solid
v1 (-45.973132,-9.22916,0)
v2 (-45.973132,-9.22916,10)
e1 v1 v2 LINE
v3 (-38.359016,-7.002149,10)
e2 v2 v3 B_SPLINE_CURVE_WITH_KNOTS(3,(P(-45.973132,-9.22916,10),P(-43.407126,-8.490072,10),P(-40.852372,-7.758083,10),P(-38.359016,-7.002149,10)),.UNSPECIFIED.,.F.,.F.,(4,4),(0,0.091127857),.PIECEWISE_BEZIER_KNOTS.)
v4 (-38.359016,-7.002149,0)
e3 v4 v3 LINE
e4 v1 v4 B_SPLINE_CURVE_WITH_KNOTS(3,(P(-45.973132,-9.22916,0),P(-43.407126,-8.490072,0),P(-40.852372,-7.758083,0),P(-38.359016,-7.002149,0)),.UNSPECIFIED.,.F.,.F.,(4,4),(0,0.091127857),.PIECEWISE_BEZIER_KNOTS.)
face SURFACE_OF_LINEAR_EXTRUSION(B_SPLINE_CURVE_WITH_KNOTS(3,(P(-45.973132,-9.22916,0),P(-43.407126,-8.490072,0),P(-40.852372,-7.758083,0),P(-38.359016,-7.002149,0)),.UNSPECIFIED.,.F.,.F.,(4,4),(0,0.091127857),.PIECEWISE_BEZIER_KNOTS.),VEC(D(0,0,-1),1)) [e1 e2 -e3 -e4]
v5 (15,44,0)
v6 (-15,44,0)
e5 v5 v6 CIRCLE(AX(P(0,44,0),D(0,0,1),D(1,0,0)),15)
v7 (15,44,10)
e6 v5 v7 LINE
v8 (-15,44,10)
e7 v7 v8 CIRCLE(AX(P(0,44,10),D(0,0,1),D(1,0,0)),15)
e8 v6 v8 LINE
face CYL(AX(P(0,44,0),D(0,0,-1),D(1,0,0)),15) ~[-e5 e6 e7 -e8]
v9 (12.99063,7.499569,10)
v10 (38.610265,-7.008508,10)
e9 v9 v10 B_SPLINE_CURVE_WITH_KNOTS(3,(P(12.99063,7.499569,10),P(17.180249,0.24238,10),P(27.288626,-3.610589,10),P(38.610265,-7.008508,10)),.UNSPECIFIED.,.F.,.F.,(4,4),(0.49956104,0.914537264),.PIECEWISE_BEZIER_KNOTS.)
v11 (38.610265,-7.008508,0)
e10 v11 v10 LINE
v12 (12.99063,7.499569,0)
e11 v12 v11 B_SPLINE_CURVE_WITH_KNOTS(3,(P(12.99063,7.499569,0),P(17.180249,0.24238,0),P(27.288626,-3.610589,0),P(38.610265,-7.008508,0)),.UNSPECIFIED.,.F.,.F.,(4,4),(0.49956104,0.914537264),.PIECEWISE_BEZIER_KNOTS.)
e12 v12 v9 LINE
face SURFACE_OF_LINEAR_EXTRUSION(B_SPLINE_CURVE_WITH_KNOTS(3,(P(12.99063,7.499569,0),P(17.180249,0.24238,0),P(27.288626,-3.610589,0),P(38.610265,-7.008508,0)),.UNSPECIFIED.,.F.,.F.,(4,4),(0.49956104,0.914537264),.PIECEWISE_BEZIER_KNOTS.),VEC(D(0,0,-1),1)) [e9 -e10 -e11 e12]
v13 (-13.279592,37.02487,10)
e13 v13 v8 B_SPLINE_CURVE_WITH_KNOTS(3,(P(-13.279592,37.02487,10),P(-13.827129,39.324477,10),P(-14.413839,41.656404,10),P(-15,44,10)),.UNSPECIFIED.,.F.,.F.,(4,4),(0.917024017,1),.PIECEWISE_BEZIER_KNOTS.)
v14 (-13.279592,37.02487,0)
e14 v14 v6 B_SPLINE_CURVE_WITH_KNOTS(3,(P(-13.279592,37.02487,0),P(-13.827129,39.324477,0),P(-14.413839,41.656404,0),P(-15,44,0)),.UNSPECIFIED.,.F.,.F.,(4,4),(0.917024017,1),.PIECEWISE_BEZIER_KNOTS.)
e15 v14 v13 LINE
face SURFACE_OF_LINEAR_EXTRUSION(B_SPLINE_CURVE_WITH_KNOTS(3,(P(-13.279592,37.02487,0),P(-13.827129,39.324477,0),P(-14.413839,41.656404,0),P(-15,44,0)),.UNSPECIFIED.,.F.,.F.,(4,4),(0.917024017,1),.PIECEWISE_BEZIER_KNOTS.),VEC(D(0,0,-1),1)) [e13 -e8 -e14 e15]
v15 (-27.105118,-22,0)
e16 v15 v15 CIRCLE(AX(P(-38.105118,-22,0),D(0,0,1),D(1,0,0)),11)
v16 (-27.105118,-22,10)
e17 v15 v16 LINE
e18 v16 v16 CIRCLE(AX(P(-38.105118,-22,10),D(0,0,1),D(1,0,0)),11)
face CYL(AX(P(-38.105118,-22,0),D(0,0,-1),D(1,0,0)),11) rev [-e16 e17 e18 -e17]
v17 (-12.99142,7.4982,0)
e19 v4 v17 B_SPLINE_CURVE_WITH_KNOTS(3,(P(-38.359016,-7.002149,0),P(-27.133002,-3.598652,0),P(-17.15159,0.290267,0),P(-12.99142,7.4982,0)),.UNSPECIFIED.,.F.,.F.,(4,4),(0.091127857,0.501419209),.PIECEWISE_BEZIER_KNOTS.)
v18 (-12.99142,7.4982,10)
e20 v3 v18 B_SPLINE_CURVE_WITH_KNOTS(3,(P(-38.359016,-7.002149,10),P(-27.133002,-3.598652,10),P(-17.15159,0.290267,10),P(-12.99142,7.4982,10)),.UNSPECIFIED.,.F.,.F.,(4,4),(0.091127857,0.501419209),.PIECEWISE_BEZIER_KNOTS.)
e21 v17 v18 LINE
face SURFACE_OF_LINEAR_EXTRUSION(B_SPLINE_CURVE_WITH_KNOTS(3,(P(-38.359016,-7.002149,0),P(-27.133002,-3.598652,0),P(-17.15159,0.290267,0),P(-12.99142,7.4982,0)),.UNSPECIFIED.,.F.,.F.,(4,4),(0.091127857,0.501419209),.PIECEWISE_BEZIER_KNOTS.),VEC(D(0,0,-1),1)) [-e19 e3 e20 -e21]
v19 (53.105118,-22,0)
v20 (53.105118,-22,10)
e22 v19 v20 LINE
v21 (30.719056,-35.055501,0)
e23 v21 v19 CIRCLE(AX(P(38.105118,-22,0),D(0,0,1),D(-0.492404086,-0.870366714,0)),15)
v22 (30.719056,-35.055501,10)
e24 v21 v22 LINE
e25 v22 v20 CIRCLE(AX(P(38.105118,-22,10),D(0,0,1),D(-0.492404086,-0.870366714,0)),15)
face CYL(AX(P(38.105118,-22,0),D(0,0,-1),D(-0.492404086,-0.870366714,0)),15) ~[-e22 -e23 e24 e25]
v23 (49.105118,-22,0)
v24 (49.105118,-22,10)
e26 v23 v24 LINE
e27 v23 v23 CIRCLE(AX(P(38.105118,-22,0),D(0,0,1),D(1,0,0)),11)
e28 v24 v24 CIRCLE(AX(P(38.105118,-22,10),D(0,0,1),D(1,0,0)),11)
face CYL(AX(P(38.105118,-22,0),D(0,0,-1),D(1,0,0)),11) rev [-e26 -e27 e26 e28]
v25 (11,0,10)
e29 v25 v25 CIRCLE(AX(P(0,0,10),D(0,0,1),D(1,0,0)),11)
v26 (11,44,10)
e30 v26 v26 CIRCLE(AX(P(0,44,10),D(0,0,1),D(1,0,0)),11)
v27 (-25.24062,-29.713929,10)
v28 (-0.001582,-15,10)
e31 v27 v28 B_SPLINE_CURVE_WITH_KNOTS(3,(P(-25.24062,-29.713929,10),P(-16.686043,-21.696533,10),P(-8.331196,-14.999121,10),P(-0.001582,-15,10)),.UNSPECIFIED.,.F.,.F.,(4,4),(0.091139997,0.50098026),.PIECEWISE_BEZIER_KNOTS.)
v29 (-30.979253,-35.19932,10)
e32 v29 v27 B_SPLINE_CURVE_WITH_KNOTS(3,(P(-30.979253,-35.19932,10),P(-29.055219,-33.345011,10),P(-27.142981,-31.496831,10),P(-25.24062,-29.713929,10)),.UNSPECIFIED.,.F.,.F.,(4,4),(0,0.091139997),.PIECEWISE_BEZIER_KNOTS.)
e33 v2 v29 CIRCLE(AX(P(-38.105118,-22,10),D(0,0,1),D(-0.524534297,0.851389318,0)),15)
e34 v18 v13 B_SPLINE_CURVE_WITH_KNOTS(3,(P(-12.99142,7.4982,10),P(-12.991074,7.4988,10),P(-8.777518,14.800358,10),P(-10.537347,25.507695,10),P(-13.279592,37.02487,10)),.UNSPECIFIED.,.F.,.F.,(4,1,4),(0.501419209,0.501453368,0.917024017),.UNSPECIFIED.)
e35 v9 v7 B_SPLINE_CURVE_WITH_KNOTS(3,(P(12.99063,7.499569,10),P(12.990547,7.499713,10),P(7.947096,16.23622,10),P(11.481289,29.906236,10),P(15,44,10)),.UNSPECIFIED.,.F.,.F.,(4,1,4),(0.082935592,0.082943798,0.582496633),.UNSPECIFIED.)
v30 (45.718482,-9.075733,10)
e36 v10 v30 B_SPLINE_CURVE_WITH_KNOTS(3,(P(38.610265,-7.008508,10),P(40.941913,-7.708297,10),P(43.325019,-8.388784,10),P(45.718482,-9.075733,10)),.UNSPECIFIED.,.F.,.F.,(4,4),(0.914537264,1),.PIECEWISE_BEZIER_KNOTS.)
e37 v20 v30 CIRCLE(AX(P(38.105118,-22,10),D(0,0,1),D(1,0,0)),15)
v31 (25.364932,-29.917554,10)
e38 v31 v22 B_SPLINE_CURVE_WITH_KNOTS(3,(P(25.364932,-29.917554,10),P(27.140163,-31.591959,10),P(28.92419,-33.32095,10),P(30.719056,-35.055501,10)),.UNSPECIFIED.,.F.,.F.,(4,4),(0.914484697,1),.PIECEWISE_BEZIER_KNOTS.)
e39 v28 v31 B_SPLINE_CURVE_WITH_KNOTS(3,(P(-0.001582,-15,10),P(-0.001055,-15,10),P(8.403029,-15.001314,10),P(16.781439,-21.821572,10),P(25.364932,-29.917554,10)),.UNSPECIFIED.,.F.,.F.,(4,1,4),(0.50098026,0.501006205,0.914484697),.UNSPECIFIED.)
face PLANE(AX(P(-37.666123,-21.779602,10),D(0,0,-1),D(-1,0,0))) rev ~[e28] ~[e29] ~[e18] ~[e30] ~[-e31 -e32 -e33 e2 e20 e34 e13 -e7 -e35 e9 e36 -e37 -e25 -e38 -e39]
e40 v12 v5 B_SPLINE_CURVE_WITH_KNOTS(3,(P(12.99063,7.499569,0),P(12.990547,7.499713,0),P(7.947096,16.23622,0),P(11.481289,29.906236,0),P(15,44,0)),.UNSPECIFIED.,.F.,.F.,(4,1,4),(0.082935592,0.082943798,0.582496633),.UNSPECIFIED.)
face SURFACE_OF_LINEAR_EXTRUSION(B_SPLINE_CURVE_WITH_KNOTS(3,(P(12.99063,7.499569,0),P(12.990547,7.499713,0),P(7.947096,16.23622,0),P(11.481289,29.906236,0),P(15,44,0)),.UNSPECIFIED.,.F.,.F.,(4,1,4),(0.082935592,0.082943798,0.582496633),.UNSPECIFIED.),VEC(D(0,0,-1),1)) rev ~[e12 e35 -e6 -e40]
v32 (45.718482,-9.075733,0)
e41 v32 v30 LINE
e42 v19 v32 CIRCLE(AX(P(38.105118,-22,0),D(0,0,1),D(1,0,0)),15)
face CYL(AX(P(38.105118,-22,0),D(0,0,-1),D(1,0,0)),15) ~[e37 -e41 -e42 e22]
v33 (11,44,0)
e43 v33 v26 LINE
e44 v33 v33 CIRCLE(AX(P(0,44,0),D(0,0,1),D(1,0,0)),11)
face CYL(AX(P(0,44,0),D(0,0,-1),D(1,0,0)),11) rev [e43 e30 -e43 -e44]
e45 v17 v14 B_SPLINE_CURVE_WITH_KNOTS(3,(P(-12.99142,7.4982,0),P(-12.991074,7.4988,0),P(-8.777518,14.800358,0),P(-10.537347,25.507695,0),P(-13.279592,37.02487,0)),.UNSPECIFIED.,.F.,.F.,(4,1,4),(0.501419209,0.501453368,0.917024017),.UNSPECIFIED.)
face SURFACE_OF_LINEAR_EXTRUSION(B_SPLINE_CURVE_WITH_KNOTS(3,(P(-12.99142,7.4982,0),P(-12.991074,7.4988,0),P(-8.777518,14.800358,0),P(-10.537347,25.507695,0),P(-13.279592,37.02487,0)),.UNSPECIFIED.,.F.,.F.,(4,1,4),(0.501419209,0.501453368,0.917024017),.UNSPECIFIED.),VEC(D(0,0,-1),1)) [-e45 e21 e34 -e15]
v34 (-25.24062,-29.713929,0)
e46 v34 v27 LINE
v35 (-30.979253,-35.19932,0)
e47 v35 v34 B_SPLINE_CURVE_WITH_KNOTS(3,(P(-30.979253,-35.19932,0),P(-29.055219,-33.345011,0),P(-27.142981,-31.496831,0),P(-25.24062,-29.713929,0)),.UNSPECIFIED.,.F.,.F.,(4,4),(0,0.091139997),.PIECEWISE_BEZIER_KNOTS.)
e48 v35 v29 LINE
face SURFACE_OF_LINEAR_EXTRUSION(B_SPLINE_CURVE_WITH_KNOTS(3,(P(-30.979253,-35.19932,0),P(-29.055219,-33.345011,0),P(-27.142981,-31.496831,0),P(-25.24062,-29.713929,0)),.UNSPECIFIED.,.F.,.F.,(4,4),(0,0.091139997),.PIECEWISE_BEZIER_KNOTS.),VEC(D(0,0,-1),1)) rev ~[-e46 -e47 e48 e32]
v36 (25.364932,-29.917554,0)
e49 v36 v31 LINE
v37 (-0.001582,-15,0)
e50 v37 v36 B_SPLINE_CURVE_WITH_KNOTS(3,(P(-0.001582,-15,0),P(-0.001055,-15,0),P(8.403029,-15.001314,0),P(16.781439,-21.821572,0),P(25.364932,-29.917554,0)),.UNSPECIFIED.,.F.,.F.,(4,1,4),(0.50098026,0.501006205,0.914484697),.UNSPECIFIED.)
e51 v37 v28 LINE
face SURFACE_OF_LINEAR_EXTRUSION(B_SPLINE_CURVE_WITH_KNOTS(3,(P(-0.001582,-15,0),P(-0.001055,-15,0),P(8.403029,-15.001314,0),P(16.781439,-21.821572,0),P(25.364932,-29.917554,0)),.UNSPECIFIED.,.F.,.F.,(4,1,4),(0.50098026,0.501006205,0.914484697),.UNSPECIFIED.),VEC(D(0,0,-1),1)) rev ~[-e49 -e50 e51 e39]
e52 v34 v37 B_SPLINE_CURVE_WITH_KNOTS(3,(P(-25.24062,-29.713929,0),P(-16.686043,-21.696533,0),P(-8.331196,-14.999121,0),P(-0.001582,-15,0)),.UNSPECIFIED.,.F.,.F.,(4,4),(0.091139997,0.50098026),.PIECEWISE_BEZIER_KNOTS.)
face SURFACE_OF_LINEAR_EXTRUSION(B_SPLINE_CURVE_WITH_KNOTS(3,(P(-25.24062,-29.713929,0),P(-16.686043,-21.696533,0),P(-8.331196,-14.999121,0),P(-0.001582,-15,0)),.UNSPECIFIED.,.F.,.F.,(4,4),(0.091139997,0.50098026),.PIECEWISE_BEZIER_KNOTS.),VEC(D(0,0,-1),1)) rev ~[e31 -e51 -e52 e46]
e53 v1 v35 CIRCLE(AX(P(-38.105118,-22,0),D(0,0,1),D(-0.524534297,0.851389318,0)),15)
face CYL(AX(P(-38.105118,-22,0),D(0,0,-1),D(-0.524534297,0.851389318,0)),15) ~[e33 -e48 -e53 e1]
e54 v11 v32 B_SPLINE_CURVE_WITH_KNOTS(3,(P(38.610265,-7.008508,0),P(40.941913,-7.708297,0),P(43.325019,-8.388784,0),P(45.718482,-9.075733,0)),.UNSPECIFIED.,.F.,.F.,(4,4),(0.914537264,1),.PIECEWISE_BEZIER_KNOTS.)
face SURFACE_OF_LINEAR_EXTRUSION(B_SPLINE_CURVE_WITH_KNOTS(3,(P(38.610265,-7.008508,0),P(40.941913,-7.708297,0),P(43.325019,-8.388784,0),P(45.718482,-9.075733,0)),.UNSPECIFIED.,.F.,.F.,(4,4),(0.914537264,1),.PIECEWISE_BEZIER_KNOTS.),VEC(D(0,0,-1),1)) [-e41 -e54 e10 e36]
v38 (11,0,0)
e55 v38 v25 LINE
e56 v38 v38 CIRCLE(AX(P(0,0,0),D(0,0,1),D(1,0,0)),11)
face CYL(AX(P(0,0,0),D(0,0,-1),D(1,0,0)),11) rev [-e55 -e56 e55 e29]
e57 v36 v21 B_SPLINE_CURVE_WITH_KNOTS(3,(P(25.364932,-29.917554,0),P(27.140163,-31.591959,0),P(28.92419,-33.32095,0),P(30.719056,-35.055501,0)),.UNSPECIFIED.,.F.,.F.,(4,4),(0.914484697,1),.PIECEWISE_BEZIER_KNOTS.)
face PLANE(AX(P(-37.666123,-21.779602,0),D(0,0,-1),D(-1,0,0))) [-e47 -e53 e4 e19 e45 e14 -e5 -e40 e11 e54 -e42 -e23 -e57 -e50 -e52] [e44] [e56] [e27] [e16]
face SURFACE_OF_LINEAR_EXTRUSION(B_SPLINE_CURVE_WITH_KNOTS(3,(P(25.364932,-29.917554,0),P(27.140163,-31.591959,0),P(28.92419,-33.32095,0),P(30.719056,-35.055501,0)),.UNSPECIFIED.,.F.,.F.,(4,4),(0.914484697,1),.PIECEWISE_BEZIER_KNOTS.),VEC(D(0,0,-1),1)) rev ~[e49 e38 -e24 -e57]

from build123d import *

# Parameters (mm, degrees)
F0_R     = 11
F1_DEPTH = 10


# Not quite as in the source:
# - ends of sketch curves that miss each other by under 0.0002 mm in the source are joined


with BuildPart() as f1:
    # F0 (on Top) → F1 (new body)
    with BuildSketch(Plane.XY):
        with BuildLine():
            add(Edge.make_bspline(
                [(-45.9731322266, -9.229160229), (-43.4071259384, -8.4900716571), (-40.8523723257, -7.7580834253), (-38.3590158595, -7.002148962)],
                knots=[0, 0, 0, 0, 0.0911278571, 0.0911278571, 0.0911278571, 0.0911278571], degree=3))
            ThreePointArc((-45.9731322266, -9.229160229), (-51.0954988233, -29.5), (-30.9792533273, -35.1993202853))
            add(Edge.make_bspline(
                [(-30.9792533273, -35.1993202853), (-29.0552189861, -33.3450108014), (-27.1429808317, -31.496831403), (-25.2406198636, -29.713928552)],
                knots=[0, 0, 0, 0, 0.0911399969, 0.0911399969, 0.0911399969, 0.0911399969], degree=3))
            ThreePointArc((-25.2406198636, -29.713928552), (-23.6488480446, -26.0020326995), (-23.1051177665, -22))
            ThreePointArc((-23.1051177665, -22), (-27.5886656888, -11.3040084285), (-38.3590158595, -7.002148962))
        make_face()
        with Locations((-38.1051177665, -22)):
            Circle(F0_R, mode=Mode.SUBTRACT)
        with BuildLine():
            add(Edge.make_bspline(
                [(-38.3590158595, -7.002148962), (-27.1330019101, -3.5986521316), (-17.1515902552, 0.2902668448), (-12.9914200153, 7.4981996163)],
                knots=[0.0911278571, 0.0911278571, 0.0911278571, 0.0911278571, 0.5014192088, 0.5014192088, 0.5014192088, 0.5014192088], degree=3))
            ThreePointArc((-38.3590158595, -7.002148962), (-27.5886656888, -11.3040084285), (-23.1051177665, -22))
            ThreePointArc((-23.1051177665, -22), (-23.6488480446, -26.0020326995), (-25.2406198636, -29.713928552))
            add(Edge.make_bspline(
                [(-25.2406198636, -29.713928552), (-16.6860428704, -21.6965333438), (-8.3311964125, -14.9991213274), (-0.001581884, -14.9999997526)],
                knots=[0.0911399969, 0.0911399969, 0.0911399969, 0.0911399969, 0.5009802604, 0.5009802604, 0.5009802604, 0.5009802604], degree=3))
            ThreePointArc((-0.001581884, -14.9999997526), (-12.9902568617, -7.5002151081), (-12.9914200153, 7.4981996163))
        make_face()
        with BuildLine():
            add(Edge.make_bspline(
                [(-12.9914200153, 7.4981996163), (-12.9910736554, 7.4987997212), (-8.7775182768, 14.8003583601), (-10.5373469555, 25.5076949363), (-13.2795920522, 37.0248702573)],
                knots=[0.5014192088, 0.5014192088, 0.5014192088, 0.5014192088, 0.5014533681, 0.9170240175, 0.9170240175, 0.9170240175, 0.9170240175], degree=3))
            ThreePointArc((-12.9914200153, 7.4981996163), (-0.000790756, 14.9999999792), (12.9906296223, 7.4995694554))
            add(Edge.make_bspline(
                [(13.2855190223, 37.0361659764), (10.5442311657, 25.5033031012), (8.7843940058, 14.7858120219), (12.9905467554, 7.4997129635), (12.9906296223, 7.4995694554)],
                knots=[0.082935592, 0.082935592, 0.082935592, 0.082935592, 0.499552834, 0.4995610405, 0.4995610405, 0.4995610405, 0.4995610405], degree=3))
            ThreePointArc((13.2855190223, 37.0361659764), (0.0063781315, 29.000001356), (-13.2795920522, 37.0248702573))
        make_face()
        with BuildLine():
            ThreePointArc((12.9906296223, 7.4995694554), (-0.000790756, 14.9999999792), (-12.9914202607, 7.498199758))
            ThreePointArc((-12.9914202607, 7.498199758), (-12.9902568617, -7.5002151081), (-0.001581884, -14.9999999166))
            ThreePointArc((-0.001581884, -14.9999999166), (10.6060424226, -10.6071609835), (15, 0))
            ThreePointArc((15, 0), (14.4889517277, 3.8820455732), (12.9906296223, 7.4995694554))
        make_face()
        Circle(F0_R, mode=Mode.SUBTRACT)
        with BuildLine():
            ThreePointArc((15, 0), (10.6060424226, -10.6071609835), (-0.001581884, -14.9999999166))
            add(Edge.make_bspline(
                [(-0.001581884, -14.9999999166), (-0.0010545892, -14.9999998083), (8.4030291654, -15.0013139041), (16.7814390471, -21.8215724341), (25.3649320041, -29.9175543408)],
                knots=[0.5009802604, 0.5009802604, 0.5009802604, 0.5009802604, 0.5010062047, 0.9144846967, 0.9144846967, 0.9144846967, 0.9144846967], degree=3))
            ThreePointArc((25.3649320041, -29.9175543408), (25.119350955, -14.4920135645), (38.6102651526, -7.008508209))
            add(Edge.make_bspline(
                [(12.9906296082, 7.4995694472), (17.1802492182, 0.2423799612), (27.2886260541, -3.6105886019), (38.6102651526, -7.008508209)],
                knots=[0.4995610405, 0.4995610405, 0.4995610405, 0.4995610405, 0.914537264, 0.914537264, 0.914537264, 0.914537264], degree=3))
            ThreePointArc((12.9906296082, 7.4995694472), (14.4889517277, 3.8820455732), (15, 0))
        make_face()
        with BuildLine():
            add(Edge.make_bspline(
                [(-13.2795920522, 37.0248702573), (-13.8271294721, 39.3244766884), (-14.4138387907, 41.6564041587), (-15, 44)],
                knots=[0.9170240175, 0.9170240175, 0.9170240175, 0.9170240175, 1, 1, 1, 1], degree=3))
            ThreePointArc((-13.2795920522, 37.0248702573), (0.0063781315, 29.000001356), (13.2855190223, 37.0361659764))
            add(Edge.make_bspline(
                [(15, 44), (14.4158248487, 41.6601580392), (13.8312245488, 39.3320018523), (13.2855190223, 37.0361659764)],
                knots=[0, 0, 0, 0, 0.082935592, 0.082935592, 0.082935592, 0.082935592], degree=3))
            ThreePointArc((15, 44), (0, 59), (-15, 44))
        make_face()
        with Locations((0, 44)):
            Circle(F0_R, mode=Mode.SUBTRACT)
        with BuildLine():
            ThreePointArc((38.6102651526, -7.008508209), (25.119350955, -14.4920135645), (25.3649320041, -29.9175543408))
            add(Edge.make_bspline(
                [(25.3649320041, -29.9175543408), (27.1401634065, -31.5919590833), (28.9241895579, -33.3209501687), (30.7190564774, -35.055500704)],
                knots=[0.9144846967, 0.9144846967, 0.9144846967, 0.9144846967, 1, 1, 1, 1], degree=3))
            ThreePointArc((30.7190564774, -35.055500704), (45.6618723829, -34.9574480384), (53.1051177665, -22))
            ThreePointArc((53.1051177665, -22), (51.1281832536, -14.5568981387), (45.7184823908, -9.0757329377))
            add(Edge.make_bspline(
                [(38.6102651526, -7.008508209), (40.9419126032, -7.7082965101), (43.3250191135, -8.3887844569), (45.7184823908, -9.0757329377)],
                knots=[0.914537264, 0.914537264, 0.914537264, 0.914537264, 1, 1, 1, 1], degree=3))
        make_face()
        with Locations((38.1051177665, -22)):
            Circle(F0_R, mode=Mode.SUBTRACT)
    extrude(amount=F1_DEPTH)


solid = f1.part
